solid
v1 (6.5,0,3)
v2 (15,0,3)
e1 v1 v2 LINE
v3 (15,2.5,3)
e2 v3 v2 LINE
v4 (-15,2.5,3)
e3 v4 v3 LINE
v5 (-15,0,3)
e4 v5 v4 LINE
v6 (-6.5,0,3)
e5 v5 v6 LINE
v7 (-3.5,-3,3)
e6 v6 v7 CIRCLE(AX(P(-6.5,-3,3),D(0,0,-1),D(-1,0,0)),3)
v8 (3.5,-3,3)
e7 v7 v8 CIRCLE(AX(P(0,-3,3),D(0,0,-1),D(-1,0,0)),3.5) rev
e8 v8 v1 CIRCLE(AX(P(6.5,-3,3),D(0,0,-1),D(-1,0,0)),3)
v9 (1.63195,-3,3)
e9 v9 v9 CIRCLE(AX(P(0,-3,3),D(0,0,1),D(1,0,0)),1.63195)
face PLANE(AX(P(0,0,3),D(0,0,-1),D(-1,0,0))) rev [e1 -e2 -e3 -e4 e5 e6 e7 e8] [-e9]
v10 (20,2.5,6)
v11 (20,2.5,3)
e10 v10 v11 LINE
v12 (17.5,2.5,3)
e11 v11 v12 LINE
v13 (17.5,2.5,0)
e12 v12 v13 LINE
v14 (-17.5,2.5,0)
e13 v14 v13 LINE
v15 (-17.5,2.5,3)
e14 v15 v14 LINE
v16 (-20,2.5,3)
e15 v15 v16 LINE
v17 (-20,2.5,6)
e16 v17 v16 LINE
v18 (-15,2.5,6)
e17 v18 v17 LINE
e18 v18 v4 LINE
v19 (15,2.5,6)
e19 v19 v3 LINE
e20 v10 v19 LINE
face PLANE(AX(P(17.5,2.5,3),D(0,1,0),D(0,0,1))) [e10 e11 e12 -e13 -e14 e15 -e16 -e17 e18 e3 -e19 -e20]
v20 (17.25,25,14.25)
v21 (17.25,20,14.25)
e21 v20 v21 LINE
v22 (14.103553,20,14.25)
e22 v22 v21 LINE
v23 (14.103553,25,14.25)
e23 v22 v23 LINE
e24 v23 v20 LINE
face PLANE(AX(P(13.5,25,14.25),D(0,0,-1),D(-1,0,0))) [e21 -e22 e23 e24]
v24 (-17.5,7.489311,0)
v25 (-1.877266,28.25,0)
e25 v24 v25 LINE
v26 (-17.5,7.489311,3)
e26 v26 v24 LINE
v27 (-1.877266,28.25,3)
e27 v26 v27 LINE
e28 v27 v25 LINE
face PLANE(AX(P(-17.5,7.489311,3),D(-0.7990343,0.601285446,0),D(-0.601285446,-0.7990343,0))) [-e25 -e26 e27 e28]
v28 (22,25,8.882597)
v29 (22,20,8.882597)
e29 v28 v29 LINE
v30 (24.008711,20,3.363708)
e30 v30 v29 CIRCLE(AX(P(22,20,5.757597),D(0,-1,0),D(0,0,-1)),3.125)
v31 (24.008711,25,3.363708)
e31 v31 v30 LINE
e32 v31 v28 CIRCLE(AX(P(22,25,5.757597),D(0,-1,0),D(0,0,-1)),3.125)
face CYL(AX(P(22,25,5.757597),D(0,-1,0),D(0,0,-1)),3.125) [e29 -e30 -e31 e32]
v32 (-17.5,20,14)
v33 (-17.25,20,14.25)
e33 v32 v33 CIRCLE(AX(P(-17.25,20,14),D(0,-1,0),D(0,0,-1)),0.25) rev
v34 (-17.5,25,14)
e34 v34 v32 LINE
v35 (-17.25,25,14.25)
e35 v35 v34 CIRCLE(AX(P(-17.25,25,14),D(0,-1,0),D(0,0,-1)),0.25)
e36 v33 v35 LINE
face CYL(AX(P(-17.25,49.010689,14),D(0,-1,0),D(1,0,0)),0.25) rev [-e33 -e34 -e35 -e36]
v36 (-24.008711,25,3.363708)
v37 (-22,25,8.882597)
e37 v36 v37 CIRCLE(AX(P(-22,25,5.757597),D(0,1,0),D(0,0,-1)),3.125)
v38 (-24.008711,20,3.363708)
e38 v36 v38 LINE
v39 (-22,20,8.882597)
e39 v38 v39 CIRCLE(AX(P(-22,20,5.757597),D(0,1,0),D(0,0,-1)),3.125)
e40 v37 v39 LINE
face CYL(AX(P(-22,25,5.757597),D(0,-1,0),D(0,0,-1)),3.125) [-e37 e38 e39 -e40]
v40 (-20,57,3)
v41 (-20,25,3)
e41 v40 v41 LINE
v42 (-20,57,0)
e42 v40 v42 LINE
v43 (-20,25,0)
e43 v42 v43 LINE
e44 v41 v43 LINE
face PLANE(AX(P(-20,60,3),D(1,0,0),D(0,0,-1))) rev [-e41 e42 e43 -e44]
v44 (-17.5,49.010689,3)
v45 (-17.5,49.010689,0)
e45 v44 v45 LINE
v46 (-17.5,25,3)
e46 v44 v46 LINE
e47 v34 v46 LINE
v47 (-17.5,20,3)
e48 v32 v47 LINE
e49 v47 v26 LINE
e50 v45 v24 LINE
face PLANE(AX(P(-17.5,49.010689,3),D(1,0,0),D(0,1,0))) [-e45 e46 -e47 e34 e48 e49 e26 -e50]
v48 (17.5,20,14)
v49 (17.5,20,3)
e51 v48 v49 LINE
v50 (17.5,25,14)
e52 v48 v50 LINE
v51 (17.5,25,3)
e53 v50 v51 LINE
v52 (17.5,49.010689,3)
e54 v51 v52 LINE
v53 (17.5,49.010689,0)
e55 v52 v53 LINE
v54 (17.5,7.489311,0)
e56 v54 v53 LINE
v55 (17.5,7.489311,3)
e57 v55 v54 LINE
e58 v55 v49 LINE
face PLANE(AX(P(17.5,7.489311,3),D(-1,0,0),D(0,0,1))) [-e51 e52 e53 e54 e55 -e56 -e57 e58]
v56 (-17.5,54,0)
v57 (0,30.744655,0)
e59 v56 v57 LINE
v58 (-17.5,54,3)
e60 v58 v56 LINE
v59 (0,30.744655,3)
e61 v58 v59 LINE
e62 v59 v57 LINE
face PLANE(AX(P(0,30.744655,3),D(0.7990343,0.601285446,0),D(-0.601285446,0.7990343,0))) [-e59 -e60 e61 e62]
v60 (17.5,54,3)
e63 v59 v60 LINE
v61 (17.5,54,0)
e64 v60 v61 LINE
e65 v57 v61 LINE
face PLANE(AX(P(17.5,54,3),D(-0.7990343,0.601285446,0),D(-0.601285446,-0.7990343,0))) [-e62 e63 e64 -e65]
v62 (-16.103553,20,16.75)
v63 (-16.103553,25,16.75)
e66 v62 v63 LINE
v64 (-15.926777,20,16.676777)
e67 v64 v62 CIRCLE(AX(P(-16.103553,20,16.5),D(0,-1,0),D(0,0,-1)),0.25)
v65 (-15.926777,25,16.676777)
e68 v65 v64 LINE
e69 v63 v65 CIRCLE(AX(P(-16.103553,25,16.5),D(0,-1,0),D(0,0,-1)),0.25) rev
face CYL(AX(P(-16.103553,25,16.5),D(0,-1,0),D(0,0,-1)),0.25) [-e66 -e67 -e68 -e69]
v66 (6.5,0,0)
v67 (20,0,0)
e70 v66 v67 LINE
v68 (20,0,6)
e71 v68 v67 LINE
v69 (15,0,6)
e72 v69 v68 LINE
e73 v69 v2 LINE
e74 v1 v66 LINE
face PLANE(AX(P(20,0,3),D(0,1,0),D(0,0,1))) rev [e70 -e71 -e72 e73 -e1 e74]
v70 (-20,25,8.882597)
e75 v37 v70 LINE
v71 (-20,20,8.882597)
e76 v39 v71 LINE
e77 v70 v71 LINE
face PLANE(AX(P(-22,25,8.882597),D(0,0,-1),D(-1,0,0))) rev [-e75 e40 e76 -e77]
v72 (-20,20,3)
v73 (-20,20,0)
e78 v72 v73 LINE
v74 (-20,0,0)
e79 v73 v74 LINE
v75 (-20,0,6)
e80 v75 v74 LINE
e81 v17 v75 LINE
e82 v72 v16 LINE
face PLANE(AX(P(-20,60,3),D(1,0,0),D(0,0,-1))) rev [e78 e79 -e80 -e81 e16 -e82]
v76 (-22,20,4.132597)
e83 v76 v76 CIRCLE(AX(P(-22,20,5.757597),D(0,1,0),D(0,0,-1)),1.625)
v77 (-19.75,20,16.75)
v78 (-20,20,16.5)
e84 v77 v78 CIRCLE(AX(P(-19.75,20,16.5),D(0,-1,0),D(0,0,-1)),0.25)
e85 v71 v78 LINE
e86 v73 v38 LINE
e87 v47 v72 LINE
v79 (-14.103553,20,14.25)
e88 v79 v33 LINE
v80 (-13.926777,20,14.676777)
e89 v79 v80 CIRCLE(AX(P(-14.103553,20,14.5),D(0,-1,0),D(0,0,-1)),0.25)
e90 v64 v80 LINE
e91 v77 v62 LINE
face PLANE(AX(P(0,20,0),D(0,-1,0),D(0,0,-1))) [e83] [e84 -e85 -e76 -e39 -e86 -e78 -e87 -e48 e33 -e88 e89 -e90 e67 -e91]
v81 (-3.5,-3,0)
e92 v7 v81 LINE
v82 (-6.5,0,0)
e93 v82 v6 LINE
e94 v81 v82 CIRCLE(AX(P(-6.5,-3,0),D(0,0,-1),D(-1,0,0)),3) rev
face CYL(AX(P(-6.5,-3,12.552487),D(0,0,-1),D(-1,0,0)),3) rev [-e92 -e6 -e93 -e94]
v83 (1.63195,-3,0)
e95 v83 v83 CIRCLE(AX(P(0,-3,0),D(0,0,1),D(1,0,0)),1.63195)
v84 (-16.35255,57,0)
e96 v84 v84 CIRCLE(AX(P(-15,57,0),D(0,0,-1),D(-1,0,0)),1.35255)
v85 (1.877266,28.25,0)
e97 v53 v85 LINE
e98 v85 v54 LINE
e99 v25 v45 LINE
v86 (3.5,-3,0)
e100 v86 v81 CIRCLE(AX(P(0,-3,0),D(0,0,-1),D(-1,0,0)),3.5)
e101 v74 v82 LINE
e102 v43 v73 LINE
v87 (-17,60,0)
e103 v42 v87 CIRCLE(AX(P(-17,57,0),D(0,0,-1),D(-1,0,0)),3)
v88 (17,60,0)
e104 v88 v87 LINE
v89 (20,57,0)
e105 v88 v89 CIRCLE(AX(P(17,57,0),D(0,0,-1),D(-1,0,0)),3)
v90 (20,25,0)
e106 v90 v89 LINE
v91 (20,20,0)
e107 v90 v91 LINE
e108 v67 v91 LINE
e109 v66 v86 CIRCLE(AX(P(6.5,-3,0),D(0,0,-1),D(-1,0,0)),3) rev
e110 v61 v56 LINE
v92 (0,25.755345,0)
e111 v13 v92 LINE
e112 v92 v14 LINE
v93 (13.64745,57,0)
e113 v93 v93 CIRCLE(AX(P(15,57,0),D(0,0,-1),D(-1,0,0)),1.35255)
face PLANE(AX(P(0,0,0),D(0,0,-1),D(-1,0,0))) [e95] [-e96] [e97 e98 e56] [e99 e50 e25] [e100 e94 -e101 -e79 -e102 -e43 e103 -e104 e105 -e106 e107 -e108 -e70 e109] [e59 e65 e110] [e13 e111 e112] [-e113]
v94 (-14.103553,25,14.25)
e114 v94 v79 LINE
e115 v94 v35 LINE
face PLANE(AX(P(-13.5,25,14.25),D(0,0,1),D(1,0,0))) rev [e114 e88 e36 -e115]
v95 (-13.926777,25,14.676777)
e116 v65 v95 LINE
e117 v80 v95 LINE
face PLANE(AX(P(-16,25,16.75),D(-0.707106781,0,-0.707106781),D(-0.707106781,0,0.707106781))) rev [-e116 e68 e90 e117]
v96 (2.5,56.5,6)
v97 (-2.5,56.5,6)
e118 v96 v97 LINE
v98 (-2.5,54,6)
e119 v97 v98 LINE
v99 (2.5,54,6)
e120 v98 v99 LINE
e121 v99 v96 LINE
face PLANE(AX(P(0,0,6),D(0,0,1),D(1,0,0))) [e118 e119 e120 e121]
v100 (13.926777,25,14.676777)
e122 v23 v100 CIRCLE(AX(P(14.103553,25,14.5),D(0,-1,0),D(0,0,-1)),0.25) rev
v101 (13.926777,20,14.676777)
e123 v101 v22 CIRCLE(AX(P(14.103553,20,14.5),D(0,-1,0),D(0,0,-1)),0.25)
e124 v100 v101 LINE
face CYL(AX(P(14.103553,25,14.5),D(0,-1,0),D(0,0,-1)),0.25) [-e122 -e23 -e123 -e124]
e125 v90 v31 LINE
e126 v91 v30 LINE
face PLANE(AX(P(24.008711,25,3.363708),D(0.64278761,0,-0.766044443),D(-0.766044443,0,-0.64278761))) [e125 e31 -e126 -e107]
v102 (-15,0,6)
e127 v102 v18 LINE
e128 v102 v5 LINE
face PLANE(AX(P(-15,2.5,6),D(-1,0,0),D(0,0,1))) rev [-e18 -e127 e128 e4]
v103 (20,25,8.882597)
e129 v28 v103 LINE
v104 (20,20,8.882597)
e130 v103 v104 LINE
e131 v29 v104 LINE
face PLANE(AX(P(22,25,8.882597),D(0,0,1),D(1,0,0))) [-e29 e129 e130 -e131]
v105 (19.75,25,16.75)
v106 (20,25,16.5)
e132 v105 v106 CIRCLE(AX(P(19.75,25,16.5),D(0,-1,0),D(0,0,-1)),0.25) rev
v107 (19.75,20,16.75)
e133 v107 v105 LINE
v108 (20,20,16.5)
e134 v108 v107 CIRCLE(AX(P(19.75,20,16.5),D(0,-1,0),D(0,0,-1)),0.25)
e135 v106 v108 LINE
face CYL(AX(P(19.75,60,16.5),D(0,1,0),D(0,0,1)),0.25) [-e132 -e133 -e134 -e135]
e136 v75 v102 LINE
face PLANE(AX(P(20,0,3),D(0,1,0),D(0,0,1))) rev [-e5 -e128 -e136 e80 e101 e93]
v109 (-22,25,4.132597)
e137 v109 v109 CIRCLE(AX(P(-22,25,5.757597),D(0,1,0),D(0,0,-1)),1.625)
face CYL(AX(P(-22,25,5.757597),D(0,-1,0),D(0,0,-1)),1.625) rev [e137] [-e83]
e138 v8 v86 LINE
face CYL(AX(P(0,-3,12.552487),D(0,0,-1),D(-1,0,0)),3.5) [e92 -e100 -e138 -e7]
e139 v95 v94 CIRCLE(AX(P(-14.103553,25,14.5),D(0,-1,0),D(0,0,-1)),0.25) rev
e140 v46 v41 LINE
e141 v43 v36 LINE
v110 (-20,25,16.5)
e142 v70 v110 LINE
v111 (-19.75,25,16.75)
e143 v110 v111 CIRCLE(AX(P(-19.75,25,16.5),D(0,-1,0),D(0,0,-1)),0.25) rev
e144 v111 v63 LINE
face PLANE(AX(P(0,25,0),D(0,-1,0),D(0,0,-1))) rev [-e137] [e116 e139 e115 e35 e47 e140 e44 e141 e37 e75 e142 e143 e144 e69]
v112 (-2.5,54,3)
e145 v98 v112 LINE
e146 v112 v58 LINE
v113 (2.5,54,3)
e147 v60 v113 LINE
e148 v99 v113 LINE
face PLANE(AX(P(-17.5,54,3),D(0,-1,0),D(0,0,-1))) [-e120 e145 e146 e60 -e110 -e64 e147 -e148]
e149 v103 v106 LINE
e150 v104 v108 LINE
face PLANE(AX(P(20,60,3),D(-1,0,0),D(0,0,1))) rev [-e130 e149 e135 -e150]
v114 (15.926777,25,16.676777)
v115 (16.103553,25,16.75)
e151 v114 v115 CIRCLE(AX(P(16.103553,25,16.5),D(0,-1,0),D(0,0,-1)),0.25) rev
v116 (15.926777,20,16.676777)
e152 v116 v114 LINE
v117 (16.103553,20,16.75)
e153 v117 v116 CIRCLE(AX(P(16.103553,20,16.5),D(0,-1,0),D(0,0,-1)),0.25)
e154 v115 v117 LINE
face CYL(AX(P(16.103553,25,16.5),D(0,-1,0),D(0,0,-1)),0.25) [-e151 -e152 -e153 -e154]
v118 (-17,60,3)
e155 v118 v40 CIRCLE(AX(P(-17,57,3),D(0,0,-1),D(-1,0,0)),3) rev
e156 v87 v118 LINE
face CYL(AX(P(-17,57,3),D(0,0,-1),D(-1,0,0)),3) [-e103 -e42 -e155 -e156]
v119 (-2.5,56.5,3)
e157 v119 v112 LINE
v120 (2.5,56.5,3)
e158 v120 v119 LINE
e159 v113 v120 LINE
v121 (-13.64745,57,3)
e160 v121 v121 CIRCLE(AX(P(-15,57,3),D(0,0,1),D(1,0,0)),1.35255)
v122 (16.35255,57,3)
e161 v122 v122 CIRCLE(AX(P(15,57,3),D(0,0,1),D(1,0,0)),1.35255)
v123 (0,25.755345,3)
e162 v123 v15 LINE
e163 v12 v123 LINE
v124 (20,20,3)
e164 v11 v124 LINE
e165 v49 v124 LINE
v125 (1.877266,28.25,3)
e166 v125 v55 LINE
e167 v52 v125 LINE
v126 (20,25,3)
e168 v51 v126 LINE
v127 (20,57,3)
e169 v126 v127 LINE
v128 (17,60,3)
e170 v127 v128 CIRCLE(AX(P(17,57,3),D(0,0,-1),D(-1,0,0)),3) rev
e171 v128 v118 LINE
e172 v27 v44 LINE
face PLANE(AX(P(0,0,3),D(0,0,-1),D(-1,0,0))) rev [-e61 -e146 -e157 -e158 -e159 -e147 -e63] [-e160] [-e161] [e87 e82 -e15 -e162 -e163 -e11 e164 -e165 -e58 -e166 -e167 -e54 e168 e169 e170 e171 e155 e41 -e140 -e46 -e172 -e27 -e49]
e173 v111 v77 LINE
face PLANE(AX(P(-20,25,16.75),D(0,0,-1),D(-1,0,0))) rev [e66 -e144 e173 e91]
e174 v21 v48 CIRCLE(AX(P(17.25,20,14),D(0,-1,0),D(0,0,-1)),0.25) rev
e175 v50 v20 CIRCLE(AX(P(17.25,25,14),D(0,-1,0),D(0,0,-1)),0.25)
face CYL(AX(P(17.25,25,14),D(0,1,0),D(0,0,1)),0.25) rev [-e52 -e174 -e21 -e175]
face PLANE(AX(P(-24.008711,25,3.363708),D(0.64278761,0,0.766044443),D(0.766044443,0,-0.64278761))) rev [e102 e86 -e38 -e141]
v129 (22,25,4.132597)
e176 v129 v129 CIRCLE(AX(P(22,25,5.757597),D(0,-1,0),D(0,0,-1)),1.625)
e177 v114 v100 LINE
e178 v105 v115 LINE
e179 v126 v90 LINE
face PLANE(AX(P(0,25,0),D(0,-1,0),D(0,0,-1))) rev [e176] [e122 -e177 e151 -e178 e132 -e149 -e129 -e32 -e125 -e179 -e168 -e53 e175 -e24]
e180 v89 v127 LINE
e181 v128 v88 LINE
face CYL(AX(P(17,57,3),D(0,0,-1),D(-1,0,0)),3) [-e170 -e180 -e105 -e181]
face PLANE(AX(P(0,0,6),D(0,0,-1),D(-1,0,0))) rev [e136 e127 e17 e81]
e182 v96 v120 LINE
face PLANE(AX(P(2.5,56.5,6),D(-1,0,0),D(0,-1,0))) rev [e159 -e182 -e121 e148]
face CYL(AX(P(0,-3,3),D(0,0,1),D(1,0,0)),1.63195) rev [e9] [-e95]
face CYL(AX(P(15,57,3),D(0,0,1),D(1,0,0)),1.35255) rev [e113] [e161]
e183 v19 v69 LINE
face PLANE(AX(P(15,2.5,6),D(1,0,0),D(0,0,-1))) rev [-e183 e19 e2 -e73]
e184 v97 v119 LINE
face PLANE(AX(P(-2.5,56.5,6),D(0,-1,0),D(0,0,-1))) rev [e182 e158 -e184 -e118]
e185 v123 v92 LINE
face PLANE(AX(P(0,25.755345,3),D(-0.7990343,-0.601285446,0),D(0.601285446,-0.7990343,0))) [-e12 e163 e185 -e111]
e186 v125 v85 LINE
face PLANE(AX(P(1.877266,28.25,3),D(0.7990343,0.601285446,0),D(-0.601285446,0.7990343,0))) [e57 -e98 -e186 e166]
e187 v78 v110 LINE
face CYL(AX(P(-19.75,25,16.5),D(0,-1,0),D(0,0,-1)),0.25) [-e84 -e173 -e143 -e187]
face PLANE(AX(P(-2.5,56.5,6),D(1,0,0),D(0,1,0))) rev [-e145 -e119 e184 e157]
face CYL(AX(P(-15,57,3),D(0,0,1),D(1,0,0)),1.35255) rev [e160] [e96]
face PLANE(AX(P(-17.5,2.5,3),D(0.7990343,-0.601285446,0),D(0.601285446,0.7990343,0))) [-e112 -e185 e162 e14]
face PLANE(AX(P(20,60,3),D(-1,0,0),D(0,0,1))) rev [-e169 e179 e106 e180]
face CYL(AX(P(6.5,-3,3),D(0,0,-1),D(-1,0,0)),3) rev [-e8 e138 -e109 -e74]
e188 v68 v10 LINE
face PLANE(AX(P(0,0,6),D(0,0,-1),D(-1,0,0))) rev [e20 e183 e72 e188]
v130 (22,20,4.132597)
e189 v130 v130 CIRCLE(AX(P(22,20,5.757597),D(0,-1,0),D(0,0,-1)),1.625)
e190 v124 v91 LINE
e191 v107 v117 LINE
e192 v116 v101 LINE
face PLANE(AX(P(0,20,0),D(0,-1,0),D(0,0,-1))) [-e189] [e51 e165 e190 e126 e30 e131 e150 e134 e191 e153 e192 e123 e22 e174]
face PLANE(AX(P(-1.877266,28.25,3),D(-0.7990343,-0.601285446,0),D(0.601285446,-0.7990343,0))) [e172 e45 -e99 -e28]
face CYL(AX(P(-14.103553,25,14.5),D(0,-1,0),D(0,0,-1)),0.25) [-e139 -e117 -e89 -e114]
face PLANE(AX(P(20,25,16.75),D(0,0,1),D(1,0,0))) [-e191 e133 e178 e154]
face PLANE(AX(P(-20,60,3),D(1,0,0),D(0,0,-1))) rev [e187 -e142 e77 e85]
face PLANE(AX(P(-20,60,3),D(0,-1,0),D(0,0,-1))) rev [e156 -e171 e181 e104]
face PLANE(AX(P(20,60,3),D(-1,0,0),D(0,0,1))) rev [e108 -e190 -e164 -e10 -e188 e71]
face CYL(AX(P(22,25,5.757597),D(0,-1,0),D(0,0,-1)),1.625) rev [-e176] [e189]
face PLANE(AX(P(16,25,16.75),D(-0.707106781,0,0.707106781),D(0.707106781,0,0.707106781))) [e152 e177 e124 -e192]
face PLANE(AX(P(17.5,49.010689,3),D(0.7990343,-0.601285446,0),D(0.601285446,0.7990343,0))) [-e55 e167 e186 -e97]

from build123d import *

# Parameters (mm, degrees)
SKETCH1_W                 = 40
SKETCH1_H                 = 60
BOSS_EXTRUDE1_DEPTH       = 3
F_2_CLEARANCE_HOLE1_D     = 2.7051
F_2_CLEARANCE_HOLE1_DEPTH = 10
F_2_CLEARANCE_HOLE1_TIP   = 0.81269403
BOSS_EXTRUDE2_START       = -20
BOSS_EXTRUDE2_DEPTH       = 5
SKETCH6_R                 = 1.625
BOSS_EXTRUDE4_DEPTH       = 5
FILLET2_R                 = 0.25
SKETCH5_W                 = 5
SKETCH5_H                 = 2.5
BOSS_EXTRUDE3_DEPTH       = 3
BOSS_EXTRUDE5_DEPTH       = 3
F_4_CLEARANCE_HOLE1_D     = 3.2639
FILLET3_START             = -1
FILLET3_DEPTH             = 4
FILLET3_2_DEPTH           = 3


with BuildPart() as part:
    # Sketch1 → Boss-Extrude1 (new body)
    with BuildSketch(Plane.XY):
        with Locations((0, 30)):
            Rectangle(SKETCH1_W, SKETCH1_H)
        Polygon((-17.5, 54), (17.5, 54), (0, 30.744655424), align=None, mode=Mode.SUBTRACT)
        Polygon((-17.5, 49.010689152), (-17.5, 7.489310848), (-1.877266096, 28.25), align=None, mode=Mode.SUBTRACT)
        Polygon((17.5, 49.010689152), (1.877266096, 28.25), (17.5, 7.489310848), align=None, mode=Mode.SUBTRACT)
        Polygon((17.5, 2.5), (-17.5, 2.5), (0, 25.755344576), align=None, mode=Mode.SUBTRACT)
    extrude(amount=BOSS_EXTRUDE1_DEPTH)

    # #2 Clearance Hole1
    with Locations(Plane.XY.offset(3)):
        with Locations((-15, 57), (15, 57)):
            Hole(F_2_CLEARANCE_HOLE1_D / 2, depth=F_2_CLEARANCE_HOLE1_DEPTH)
            with Locations((0, 0, -(F_2_CLEARANCE_HOLE1_DEPTH + F_2_CLEARANCE_HOLE1_TIP / 2))):  # 118° drill point
                Cone(0, F_2_CLEARANCE_HOLE1_D / 2, F_2_CLEARANCE_HOLE1_TIP, mode=Mode.SUBTRACT)

    # Sketch4 → Boss-Extrude2 (add)
    with BuildSketch(Plane.XZ.offset(BOSS_EXTRUDE2_START)):
        Polygon((20, 3), (20, 16.75), (16, 16.75), (13.5, 14.25), (17.5, 14.25), (17.5, 3), align=None)
    boss_extrude2 = extrude(amount=-BOSS_EXTRUDE2_DEPTH)

    # Sketch6 → Boss-Extrude4 (add)
    with BuildSketch(Plane.XZ.offset(-20)):
        with BuildLine():
            Line((20, 8.882597042), (20, 0))
            Line((20, 0), (24.00871128, 3.363708157))
            ThreePointArc((24.00871128, 3.363708157), (24.93653944, 6.826409989), (22, 8.882597042))
            Line((22, 8.882597042), (20, 8.882597042))
        make_face()
        with Locations(Location((22, 5.757597042, 0), (0, 0, 270))):
            Circle(SKETCH6_R, mode=Mode.SUBTRACT)
    boss_extrude4 = extrude(amount=-BOSS_EXTRUDE4_DEPTH)

    # Mirror1: Boss-Extrude2, Boss-Extrude4 across plane
    add(boss_extrude2.mirror(Plane(origin=(0, 0, 0), x_dir=(0, 0, 1), z_dir=(1, 0, 0))))
    add(boss_extrude4.mirror(Plane(origin=(0, 0, 0), x_dir=(0, 0, 1), z_dir=(1, 0, 0))))

    # Fillet2
    fillet2_edges = [part.edges().sort_by_distance(p)[0] for p in [
        (-20, 22.5, 16.75),
        (-16, 22.5, 16.75),
        (-13.5, 22.5, 14.25),
        (-17.5, 22.5, 14.25),
        (17.5, 22.5, 14.25),
        (13.5, 22.5, 14.25),
        (16, 22.5, 16.75),
        (20, 22.5, 16.75),
    ]]
    fillet(fillet2_edges, radius=FILLET2_R)

    # Sketch5 → Boss-Extrude3 (add)
    with BuildSketch(Plane.XY.offset(3)):
        with Locations((17.5, 1.25)):
            Rectangle(SKETCH5_W, SKETCH5_H)
        with Locations((-17.5, 1.25)):
            Rectangle(SKETCH5_W, SKETCH5_H)
        with Locations((0, 55.25)):
            Rectangle(SKETCH5_W, SKETCH5_H)
    extrude(amount=BOSS_EXTRUDE3_DEPTH)

    # Sketch7 → Boss-Extrude5 (add)
    with BuildSketch(Plane(origin=(0, 0, 0), x_dir=(-1, 0, 0), z_dir=(0, 0, -1))):
        with BuildLine():
            Line((3.5, -3), (3.5, 0))
            Line((3.5, 0), (-3.5, 0))
            Line((-3.5, 0), (-3.5, -3))
            ThreePointArc((-3.5, -3), (0, -6.5), (3.5, -3))
        make_face()
    extrude(amount=-BOSS_EXTRUDE5_DEPTH)

    # #4 Clearance Hole1 (through all)
    with Locations(Plane.XY.offset(3)):
        with Locations((0, -3)):
            Hole(F_4_CLEARANCE_HOLE1_D / 2)

    # Fillet3: read off the stored shape, not the designer's step
    # Fillet3 outline → Fillet3 (cut)
    with BuildSketch(Plane.XY.offset(FILLET3_START)):
        with BuildLine():
            Line((-20, 60), (-20, 57))
            ThreePointArc((-20, 57), (-19.121320344, 59.121320344), (-17, 60))
            Line((-17, 60), (-20, 60))
        make_face()
        with BuildLine():
            Line((20, 60), (17, 60))
            ThreePointArc((17, 60), (19.121320344, 59.121320344), (20, 57))
            Line((20, 57), (20, 60))
        make_face()
    extrude(amount=FILLET3_DEPTH, mode=Mode.SUBTRACT)

    # Fillet3 2 outline → Fillet3 2 (add)
    with BuildSketch(Plane.XY):
        with BuildLine():
            Line((-3.5, 0), (-6.5, 0))
            ThreePointArc((-6.5, 0), (-4.378679656, -0.878679656), (-3.5, -3))
            Line((-3.5, -3), (-3.5, 0))
        make_face()
        with BuildLine():
            Line((3.5, 0), (3.5, -3))
            ThreePointArc((3.5, -3), (4.378679656, -0.878679656), (6.5, 0))
            Line((6.5, 0), (3.5, 0))
        make_face()
    extrude(amount=FILLET3_2_DEPTH)


solid = part.part
